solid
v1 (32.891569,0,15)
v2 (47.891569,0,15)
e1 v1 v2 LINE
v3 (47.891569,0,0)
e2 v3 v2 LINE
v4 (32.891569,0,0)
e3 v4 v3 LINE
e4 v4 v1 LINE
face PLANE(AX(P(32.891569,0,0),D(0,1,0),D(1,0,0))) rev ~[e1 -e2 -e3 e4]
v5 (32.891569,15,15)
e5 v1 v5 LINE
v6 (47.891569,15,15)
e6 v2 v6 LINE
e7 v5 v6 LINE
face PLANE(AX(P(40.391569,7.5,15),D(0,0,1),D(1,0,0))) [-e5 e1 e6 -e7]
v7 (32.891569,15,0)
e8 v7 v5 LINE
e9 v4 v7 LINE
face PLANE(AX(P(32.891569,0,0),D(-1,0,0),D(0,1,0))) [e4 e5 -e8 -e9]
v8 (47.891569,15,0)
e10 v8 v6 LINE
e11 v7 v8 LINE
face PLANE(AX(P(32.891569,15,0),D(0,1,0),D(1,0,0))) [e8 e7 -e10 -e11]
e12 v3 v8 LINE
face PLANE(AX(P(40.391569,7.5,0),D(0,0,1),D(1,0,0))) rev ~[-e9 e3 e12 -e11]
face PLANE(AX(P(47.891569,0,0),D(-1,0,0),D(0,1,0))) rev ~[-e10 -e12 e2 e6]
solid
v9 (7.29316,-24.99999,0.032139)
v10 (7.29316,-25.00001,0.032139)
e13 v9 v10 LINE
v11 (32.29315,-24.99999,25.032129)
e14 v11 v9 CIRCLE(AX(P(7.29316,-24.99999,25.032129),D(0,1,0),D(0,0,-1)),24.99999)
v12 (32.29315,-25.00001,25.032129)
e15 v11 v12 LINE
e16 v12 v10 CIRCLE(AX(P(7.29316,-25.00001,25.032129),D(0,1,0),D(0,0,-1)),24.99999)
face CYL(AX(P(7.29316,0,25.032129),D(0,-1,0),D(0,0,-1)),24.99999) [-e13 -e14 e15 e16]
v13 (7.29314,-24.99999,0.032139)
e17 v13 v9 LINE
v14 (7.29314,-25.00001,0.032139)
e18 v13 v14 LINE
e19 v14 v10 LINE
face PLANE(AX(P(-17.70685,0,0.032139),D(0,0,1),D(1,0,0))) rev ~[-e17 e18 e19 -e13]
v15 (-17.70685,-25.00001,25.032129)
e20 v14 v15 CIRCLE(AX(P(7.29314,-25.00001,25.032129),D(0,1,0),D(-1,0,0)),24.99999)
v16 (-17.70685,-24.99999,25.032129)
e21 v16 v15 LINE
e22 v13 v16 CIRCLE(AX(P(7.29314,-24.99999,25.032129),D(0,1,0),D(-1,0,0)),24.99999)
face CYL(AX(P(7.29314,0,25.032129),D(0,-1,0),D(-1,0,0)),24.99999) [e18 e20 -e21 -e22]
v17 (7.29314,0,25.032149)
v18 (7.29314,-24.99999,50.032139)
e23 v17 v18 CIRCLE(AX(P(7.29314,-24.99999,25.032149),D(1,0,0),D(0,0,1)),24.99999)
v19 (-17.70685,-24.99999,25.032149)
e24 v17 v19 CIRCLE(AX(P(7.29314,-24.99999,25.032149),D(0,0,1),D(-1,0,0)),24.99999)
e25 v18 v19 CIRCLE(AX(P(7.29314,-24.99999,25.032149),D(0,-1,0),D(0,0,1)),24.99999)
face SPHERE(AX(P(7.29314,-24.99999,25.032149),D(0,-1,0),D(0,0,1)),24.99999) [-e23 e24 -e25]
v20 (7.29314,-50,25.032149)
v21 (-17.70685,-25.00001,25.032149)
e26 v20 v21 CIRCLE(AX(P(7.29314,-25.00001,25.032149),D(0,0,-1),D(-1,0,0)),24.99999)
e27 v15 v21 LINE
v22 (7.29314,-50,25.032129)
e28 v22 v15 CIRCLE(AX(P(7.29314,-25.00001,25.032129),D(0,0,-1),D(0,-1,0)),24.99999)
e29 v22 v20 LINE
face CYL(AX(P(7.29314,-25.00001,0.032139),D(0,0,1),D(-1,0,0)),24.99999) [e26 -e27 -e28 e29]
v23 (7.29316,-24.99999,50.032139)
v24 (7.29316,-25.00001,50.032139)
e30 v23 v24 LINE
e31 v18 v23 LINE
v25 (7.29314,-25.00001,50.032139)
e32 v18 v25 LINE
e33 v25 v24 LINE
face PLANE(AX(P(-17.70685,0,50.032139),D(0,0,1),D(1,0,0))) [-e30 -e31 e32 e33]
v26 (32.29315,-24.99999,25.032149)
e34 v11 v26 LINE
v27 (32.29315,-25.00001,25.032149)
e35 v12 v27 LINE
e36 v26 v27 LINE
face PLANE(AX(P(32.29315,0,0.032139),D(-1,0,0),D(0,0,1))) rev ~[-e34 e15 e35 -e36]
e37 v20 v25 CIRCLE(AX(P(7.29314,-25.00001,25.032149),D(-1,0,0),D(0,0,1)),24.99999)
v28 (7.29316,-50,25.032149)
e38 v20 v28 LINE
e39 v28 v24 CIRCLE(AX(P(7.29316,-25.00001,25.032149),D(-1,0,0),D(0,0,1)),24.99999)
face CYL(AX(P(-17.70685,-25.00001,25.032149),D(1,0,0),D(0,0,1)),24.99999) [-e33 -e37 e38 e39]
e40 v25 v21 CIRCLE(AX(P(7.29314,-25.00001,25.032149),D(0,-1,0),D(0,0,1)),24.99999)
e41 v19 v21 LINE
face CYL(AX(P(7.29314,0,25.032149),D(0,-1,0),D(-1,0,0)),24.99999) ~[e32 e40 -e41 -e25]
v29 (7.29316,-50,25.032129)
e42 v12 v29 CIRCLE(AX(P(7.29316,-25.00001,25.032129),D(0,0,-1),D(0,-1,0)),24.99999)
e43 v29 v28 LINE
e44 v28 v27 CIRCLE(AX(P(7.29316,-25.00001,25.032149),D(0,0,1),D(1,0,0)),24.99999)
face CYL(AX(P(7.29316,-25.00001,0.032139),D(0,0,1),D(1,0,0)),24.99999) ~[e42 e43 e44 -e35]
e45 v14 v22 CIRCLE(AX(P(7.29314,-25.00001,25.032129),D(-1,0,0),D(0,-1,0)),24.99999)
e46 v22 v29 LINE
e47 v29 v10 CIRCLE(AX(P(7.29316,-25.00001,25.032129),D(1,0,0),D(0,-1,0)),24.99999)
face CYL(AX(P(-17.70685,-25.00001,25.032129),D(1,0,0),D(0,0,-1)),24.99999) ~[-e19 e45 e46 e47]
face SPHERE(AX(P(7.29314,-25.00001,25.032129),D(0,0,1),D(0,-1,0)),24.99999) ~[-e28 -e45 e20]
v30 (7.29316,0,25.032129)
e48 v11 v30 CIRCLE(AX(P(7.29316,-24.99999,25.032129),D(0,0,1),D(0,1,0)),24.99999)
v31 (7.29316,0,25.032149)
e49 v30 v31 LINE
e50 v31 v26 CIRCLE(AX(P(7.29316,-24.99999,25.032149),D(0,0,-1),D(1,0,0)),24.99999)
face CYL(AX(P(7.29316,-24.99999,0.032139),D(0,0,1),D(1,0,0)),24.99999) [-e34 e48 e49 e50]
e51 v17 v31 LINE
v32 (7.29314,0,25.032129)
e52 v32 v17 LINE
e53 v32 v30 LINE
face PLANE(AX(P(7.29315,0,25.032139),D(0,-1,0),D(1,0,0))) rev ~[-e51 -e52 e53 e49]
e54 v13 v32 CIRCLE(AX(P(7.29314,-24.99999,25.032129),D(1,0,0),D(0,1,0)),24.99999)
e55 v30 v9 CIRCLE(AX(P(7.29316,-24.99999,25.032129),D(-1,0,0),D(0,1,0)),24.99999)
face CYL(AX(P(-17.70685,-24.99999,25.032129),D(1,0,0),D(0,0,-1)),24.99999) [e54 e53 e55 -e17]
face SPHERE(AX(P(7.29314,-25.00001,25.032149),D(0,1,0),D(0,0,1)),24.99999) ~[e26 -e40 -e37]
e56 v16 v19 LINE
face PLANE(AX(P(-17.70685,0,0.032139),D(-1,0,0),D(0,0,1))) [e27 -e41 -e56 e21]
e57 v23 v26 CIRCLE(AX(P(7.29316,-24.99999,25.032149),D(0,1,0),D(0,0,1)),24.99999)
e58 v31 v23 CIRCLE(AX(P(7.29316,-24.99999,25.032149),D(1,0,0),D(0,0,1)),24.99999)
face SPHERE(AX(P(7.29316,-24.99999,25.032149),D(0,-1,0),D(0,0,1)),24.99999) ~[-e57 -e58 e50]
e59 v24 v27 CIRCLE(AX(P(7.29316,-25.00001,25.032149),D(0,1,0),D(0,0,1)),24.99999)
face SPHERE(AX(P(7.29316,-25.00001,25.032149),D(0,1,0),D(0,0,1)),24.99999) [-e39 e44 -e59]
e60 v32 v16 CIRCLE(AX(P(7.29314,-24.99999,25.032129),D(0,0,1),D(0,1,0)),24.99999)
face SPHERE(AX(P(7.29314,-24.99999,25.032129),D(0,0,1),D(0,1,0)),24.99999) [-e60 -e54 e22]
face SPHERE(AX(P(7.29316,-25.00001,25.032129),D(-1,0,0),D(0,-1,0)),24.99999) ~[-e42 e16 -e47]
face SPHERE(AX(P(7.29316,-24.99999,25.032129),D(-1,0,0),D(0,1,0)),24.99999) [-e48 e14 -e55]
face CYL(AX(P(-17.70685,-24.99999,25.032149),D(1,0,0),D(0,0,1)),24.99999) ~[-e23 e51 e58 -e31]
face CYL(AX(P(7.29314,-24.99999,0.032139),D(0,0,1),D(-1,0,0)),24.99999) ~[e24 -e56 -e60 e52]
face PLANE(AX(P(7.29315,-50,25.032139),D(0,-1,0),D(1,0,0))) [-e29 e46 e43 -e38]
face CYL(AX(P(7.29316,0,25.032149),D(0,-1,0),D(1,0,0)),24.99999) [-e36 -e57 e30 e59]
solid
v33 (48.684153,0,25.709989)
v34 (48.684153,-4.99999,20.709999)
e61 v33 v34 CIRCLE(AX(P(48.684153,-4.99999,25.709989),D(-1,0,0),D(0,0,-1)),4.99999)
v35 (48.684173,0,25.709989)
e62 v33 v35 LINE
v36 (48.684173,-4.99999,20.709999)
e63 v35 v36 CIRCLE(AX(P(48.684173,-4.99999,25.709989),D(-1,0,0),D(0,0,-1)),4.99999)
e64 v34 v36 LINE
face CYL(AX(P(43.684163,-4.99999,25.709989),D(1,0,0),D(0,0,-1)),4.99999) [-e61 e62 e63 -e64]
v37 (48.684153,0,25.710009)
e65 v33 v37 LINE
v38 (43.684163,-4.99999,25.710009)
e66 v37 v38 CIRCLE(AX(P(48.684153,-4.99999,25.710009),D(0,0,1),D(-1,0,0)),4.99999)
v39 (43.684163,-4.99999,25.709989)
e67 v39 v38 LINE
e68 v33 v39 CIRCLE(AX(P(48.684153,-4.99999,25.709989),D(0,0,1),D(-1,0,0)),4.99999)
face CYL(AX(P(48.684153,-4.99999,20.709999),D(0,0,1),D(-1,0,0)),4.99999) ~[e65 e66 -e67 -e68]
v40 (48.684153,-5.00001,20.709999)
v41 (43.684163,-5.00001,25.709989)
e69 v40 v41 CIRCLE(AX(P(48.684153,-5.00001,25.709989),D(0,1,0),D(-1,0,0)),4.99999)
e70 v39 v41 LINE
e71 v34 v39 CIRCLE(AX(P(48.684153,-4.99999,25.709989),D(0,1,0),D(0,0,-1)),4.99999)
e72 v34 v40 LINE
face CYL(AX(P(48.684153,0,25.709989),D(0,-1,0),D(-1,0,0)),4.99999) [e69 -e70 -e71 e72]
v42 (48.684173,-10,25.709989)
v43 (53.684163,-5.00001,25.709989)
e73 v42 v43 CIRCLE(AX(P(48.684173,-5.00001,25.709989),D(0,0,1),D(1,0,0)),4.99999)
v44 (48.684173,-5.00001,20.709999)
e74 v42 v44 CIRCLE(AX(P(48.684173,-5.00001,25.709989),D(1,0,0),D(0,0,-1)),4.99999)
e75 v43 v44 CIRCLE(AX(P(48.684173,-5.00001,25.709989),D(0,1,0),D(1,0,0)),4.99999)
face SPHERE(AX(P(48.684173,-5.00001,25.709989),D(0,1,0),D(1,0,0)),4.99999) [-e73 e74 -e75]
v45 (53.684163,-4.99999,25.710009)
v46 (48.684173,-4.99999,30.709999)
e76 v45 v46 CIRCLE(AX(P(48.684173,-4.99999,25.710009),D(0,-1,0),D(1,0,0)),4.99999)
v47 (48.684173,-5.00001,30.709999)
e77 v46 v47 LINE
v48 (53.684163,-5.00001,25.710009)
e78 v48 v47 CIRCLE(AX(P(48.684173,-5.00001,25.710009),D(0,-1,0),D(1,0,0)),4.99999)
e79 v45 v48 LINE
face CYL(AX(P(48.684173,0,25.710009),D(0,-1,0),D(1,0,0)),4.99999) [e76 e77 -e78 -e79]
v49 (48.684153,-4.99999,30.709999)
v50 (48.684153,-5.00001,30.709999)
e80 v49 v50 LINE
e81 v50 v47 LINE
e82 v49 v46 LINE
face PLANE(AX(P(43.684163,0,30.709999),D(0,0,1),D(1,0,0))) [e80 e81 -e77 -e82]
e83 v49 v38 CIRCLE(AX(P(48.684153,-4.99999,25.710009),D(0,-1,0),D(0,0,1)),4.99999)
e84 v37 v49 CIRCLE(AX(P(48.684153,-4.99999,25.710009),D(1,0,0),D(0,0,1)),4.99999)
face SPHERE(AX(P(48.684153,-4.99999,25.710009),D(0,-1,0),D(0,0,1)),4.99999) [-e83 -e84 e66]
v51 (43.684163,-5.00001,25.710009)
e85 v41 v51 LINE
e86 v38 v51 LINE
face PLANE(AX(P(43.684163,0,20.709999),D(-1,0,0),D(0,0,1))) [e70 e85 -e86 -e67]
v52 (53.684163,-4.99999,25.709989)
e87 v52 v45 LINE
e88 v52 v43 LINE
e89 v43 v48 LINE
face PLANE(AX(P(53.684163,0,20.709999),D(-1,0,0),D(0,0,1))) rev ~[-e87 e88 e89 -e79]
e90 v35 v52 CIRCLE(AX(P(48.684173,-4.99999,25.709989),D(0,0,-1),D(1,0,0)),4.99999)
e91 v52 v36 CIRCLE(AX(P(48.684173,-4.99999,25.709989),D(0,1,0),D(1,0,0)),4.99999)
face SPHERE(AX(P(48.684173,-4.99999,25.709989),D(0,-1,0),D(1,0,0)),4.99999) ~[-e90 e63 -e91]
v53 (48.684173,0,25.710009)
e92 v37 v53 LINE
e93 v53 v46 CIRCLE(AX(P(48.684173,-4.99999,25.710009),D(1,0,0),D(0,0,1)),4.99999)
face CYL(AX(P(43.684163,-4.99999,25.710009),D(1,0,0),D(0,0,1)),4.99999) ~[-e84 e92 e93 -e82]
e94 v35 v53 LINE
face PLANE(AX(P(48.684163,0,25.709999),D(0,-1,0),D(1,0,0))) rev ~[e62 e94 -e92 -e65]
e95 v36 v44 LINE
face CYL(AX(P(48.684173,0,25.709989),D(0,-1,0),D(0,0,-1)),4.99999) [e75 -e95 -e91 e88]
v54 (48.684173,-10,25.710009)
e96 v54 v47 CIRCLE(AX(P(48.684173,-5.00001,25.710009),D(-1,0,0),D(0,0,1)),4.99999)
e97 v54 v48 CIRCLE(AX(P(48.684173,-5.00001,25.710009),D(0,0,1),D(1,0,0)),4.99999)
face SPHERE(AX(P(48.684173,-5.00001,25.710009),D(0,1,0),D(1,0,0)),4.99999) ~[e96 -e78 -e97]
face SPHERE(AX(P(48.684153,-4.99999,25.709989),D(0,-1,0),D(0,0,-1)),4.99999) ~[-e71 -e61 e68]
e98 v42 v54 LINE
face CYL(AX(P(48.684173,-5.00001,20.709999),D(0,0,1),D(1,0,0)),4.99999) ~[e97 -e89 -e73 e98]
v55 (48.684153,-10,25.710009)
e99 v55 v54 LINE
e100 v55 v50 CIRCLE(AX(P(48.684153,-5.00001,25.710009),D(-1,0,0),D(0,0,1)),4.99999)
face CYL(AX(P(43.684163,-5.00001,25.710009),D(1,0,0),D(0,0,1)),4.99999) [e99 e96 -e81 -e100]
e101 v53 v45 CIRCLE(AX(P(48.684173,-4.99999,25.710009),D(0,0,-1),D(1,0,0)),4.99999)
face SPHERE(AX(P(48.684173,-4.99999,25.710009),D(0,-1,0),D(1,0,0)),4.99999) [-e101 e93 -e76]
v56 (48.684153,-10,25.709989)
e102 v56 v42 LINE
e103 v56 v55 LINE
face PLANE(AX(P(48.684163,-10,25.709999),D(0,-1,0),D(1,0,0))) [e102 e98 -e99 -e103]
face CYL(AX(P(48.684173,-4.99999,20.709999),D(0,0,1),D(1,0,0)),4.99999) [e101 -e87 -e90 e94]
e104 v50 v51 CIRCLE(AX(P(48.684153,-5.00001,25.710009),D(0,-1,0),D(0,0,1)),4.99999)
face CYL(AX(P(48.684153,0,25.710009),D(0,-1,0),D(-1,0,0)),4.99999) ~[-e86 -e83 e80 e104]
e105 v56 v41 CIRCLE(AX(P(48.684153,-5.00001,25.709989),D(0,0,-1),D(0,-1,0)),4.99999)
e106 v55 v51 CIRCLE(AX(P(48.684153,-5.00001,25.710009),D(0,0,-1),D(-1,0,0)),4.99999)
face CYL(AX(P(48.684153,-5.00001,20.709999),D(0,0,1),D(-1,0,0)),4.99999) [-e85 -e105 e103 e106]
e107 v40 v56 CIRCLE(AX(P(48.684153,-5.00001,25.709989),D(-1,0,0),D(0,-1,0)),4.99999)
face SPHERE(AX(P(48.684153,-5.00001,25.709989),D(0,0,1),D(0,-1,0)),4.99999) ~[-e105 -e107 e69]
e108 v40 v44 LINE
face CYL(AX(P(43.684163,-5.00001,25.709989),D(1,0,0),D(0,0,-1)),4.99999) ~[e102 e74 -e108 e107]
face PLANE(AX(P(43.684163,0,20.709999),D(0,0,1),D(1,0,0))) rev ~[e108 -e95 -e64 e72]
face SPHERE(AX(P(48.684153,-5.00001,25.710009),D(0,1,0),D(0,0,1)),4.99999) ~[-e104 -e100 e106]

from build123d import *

# Parameters (mm, degrees)
F0_W     = 50
F0_H     = 50
F1_DEPTH = 50
F2_R     = 24.99999
F3_W     = 10
F3_H     = 10
F4_DEPTH = 10
F5_R     = 4.99999
F6_W     = 15
F6_H     = 15
F7_DEPTH = 15


# Not quite as in the source:
# - a fillet or chamfer is up to 0.001 mm smaller than in the source, because OpenCascade refuses the exact size


with BuildPart() as f1:
    # F0 (on Front) → F1 (new body)
    with BuildSketch(Plane.XZ):
        with Locations((7.293150397, 25.0321394791)):
            Rectangle(F0_W, F0_H)
    extrude(amount=F1_DEPTH)

    # F2 (radius 25 in the source; OpenCascade refuses exactly that, so slightly less here)
    f2_edges = [f1.edges().sort_by_distance(p)[0] for p in [
        (-17.70685, -25, 50.032139),
        (32.29315, -25, 50.032139),
        (7.29315, 0, 50.032139),
        (7.29315, -50, 50.032139),
        (-17.70685, 0, 25.032139),
        (7.29315, 0, 0.032139),
        (32.29315, 0, 25.032139),
        (-17.70685, -50, 25.032139),
        (7.29315, -50, 0.032139),
        (32.29315, -50, 25.032139),
        (32.29315, -25, 0.032139),
        (-17.70685, -25, 0.032139),
    ]]
    fillet(f2_edges, radius=F2_R)


with BuildPart() as f4:
    # F3 (on Front) → F4 (new body)
    with BuildSketch(Plane.XZ):
        with Locations((48.6841630191, 25.7099985783)):
            Rectangle(F3_W, F3_H)
    extrude(amount=F4_DEPTH)

    # F5 (radius 5 in the source; OpenCascade refuses exactly that, so slightly less here)
    f5_edges = [f4.edges().sort_by_distance(p)[0] for p in [
        (53.684163, -5, 20.709999),
        (53.684163, -5, 30.709999),
        (53.684163, 0, 25.709999),
        (53.684163, -10, 25.709999),
        (43.684163, -5, 30.709999),
        (48.684163, 0, 30.709999),
        (48.684163, -10, 30.709999),
        (43.684163, -10, 25.709999),
        (48.684163, -10, 20.709999),
        (43.684163, -5, 20.709999),
        (48.684163, 0, 20.709999),
        (43.684163, 0, 25.709999),
    ]]
    fillet(f5_edges, radius=F5_R)


with BuildPart() as f7:
    # F6 (on Top) → F7 (new body)
    with BuildSketch(Plane.XY):
        with Locations((40.3915693331, 7.5)):
            Rectangle(F6_W, F6_H)
    extrude(amount=F7_DEPTH)


solid = Compound([f1.part, f4.part, f7.part])
